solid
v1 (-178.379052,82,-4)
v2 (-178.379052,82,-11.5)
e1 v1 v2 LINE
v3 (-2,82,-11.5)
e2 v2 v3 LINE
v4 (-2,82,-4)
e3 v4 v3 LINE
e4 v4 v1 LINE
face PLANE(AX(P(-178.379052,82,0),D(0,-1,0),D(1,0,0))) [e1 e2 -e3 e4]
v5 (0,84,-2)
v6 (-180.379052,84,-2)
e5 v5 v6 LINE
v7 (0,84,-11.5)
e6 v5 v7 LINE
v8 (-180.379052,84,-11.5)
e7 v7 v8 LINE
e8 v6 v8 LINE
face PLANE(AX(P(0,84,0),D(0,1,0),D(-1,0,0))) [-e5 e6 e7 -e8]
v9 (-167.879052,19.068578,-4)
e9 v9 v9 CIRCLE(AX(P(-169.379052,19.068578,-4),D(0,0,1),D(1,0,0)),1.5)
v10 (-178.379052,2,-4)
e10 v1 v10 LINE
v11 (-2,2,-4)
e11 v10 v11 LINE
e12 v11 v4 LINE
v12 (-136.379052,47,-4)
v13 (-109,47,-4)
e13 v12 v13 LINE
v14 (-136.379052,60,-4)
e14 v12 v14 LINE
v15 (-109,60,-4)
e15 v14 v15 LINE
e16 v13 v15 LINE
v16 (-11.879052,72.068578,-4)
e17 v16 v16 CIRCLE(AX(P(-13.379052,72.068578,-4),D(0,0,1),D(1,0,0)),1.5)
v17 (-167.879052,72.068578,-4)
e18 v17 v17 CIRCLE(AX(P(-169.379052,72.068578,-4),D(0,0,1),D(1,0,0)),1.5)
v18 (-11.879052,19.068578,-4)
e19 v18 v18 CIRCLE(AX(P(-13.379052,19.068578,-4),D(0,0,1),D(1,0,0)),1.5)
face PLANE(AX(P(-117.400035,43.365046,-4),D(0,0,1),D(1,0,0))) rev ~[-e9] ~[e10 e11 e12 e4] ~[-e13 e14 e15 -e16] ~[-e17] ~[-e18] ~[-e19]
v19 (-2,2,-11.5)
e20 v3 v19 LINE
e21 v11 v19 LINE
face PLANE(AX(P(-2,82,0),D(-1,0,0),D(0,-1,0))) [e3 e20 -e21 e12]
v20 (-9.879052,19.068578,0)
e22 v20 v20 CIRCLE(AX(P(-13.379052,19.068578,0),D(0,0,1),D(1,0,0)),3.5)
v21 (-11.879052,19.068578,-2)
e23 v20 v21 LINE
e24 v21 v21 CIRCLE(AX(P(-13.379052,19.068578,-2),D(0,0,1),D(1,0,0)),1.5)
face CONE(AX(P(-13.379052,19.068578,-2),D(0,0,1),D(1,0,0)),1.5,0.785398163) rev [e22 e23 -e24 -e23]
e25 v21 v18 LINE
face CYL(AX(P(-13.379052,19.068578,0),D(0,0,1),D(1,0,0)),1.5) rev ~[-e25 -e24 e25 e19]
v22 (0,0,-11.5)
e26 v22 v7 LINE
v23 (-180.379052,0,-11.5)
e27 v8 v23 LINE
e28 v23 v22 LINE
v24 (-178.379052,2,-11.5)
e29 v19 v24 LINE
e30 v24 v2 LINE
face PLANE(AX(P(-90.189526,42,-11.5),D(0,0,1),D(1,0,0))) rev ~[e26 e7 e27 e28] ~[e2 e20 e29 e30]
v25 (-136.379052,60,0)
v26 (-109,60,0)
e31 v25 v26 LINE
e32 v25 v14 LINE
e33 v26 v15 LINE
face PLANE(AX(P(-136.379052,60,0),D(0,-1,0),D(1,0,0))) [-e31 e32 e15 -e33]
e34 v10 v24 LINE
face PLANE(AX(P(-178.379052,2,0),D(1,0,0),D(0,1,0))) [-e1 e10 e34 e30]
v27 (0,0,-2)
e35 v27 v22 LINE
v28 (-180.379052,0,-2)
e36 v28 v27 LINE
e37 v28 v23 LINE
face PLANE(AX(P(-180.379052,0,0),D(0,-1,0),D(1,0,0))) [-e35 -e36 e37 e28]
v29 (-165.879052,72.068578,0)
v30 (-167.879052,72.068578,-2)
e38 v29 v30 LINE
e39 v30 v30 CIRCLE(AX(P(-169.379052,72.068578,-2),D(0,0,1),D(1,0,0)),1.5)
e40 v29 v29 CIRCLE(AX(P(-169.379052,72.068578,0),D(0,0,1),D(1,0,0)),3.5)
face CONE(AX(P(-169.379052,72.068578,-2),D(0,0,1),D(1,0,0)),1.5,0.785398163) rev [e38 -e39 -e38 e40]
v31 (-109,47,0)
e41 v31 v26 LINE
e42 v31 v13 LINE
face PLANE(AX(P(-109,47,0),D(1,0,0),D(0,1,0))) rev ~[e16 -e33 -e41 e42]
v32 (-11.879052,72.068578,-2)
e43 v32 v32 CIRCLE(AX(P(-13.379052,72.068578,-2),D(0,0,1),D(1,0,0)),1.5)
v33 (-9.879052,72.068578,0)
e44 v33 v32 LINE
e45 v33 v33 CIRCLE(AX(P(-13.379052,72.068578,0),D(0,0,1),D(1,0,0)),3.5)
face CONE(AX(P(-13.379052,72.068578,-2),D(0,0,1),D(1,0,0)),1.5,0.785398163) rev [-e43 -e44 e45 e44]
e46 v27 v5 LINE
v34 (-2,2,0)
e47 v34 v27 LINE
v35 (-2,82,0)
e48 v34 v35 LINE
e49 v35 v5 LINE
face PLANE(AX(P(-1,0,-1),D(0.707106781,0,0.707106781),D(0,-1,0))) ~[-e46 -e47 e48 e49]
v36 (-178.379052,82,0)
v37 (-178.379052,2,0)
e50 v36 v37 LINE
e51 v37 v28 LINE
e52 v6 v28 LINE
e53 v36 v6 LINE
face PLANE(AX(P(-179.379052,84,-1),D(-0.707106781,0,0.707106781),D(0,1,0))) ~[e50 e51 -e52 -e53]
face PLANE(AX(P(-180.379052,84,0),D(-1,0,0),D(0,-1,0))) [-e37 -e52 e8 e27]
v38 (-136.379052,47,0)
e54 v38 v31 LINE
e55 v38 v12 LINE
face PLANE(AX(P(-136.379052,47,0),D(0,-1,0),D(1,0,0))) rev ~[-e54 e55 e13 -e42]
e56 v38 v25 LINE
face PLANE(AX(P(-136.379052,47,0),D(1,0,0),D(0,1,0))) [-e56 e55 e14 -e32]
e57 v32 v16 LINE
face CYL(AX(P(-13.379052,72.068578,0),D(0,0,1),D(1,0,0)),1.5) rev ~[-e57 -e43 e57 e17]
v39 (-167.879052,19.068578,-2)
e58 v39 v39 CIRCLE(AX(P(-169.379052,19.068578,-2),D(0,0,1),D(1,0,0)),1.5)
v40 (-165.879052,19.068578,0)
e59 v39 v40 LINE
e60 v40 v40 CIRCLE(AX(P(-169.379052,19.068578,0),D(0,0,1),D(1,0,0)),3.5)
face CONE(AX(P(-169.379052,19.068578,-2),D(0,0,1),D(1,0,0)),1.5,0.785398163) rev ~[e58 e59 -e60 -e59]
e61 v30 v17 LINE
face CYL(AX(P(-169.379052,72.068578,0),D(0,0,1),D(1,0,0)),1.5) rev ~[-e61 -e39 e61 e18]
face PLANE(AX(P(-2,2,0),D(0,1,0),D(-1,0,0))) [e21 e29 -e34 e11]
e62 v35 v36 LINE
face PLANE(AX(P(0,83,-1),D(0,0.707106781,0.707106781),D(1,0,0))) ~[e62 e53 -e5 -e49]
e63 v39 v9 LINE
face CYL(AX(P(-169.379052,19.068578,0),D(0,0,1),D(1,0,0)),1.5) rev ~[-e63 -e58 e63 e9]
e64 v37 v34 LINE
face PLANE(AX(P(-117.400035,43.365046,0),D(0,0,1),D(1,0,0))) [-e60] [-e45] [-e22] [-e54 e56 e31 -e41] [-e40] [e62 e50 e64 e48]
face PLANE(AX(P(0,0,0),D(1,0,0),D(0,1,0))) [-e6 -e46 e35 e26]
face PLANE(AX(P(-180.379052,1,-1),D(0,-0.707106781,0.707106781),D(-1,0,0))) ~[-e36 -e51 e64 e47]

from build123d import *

# Parameters (mm, degrees)
F1_DEPTH = 11.5
F0_R     = 1.5
F2_DEPTH = 4
F3_SIZE  = 2
F4_W     = 27.3790522566
F4_H     = 13
F5_DEPTH = 25


# Not quite as in the source:
# - a feature names something its author has since deleted; it is built from what else it names


with BuildPart() as f1:
    # F0 (on Top) → F1 (new body)
    with BuildSketch(Plane.XY):
        Polygon((-180.3790522566, 0), (0, 0), (0, 42), (0, 84), (-180.3790522566, 84), align=None)
        Polygon((-2, 82), (-2, 42), (-2, 2), (-35, 2), (-178.3790522566, 2), (-178.3790522566, 82), (-35, 82), align=None, mode=Mode.SUBTRACT)
    extrude(amount=-F1_DEPTH)

    # F0 (on Top) → F2 (join)
    with BuildSketch(Plane.XY):
        Polygon((-35, 76.0685783849), (-35, 82), (-178.3790522566, 82), (-178.3790522566, 2), (-35, 2), (-35, 15.0685783849), (-63, 15.0685783849), (-173.3790522566, 15.0685783849), (-173.3790522566, 76.0685783849), align=None)
        with BuildLine():
            Line((-35, 63), (-35, 76.0685783849))
            Line((-35, 76.0685783849), (-173.3790522566, 76.0685783849))
            Line((-173.3790522566, 76.0685783849), (-173.3790522566, 15.0685783849))
            Line((-173.3790522566, 15.0685783849), (-63, 15.0685783849))
            Line((-63, 15.0685783849), (-63, 21.5))
            Line((-63, 21.5), (-163, 21.5))
            Line((-163, 21.5), (-163, 62.5))
            Line((-163, 62.5), (-63, 62.5))
            Line((-63, 62.5), (-63, 42))
            Line((-63, 42), (-56, 42))
            ThreePointArc((-56, 42), (-51, 47), (-46, 42))
            Line((-46, 42), (-40, 42))
            ThreePointArc((-40, 42), (-38.5355339059, 45.5355339059), (-35, 47))
            Line((-35, 47), (-35, 53))
            ThreePointArc((-35, 53), (-40, 58), (-35, 63))
        make_face()
        with Locations((-169.3790522566, 19.0685783849)):
            Circle(F0_R, mode=Mode.SUBTRACT)
        with Locations((-169.3790522566, 72.0685783849)):
            Circle(F0_R, mode=Mode.SUBTRACT)
        with BuildLine():
            Line((-14, 42), (-9.3790522566, 42))
            Line((-9.3790522566, 42), (-9.3790522566, 76.0685783849))
            Line((-9.3790522566, 76.0685783849), (-35, 76.0685783849))
            Line((-35, 76.0685783849), (-35, 63))
            ThreePointArc((-35, 63), (-31.4644660941, 61.5355339059), (-30, 58))
            ThreePointArc((-30, 58), (-31.4644660941, 54.4644660941), (-35, 53))
            Line((-35, 53), (-35, 47))
            ThreePointArc((-35, 47), (-31.4644660941, 45.5355339059), (-30, 42))
            Line((-30, 42), (-24, 42))
            ThreePointArc((-24, 42), (-19, 47), (-14, 42))
        make_face()
        with Locations((-13.3790522566, 72.0685783849)):
            Circle(F0_R, mode=Mode.SUBTRACT)
        Polygon((-9.3790522566, 42), (-2, 42), (-2, 82), (-35, 82), (-35, 76.0685783849), (-9.3790522566, 76.0685783849), align=None)
        Polygon((-2, 2), (-2, 42), (-9.3790522566, 42), (-9.3790522566, 15.0685783849), (-35, 15.0685783849), (-35, 2), align=None)
        with BuildLine():
            Line((-9.3790522566, 15.0685783849), (-9.3790522566, 42))
            Line((-9.3790522566, 42), (-14, 42))
            ThreePointArc((-14, 42), (-19, 37), (-24, 42))
            Line((-24, 42), (-30, 42))
            ThreePointArc((-30, 42), (-31.4644660941, 38.4644660941), (-35, 37))
            Line((-35, 37), (-35, 31))
            ThreePointArc((-35, 31), (-31.4644660941, 29.5355339059), (-30, 26))
            ThreePointArc((-30, 26), (-31.4644660941, 22.4644660941), (-35, 21))
            Line((-35, 21), (-35, 15.0685783849))
            Line((-35, 15.0685783849), (-9.3790522566, 15.0685783849))
        make_face()
        with Locations((-13.3790522566, 19.0685783849)):
            Circle(F0_R, mode=Mode.SUBTRACT)
        with BuildLine():
            Line((-63, 15.0685783849), (-35, 15.0685783849))
            Line((-35, 15.0685783849), (-35, 21))
            ThreePointArc((-35, 21), (-40, 26), (-35, 31))
            Line((-35, 31), (-35, 37))
            ThreePointArc((-35, 37), (-38.5355339059, 38.4644660941), (-40, 42))
            Line((-40, 42), (-46, 42))
            ThreePointArc((-46, 42), (-51, 37), (-56, 42))
            Line((-56, 42), (-63, 42))
            Line((-63, 42), (-63, 21.5))
            Line((-63, 21.5), (-63, 15.0685783849))
        make_face()
        with BuildLine():
            Line((-46, 42), (-56, 42))
            ThreePointArc((-56, 42), (-51, 37), (-46, 42))
        make_face()
        with BuildLine():
            ThreePointArc((-46, 42), (-51, 47), (-56, 42))
            Line((-56, 42), (-46, 42))
        make_face()
        with BuildLine():
            ThreePointArc((-35, 37), (-31.4644660941, 38.4644660941), (-30, 42))
            Line((-30, 42), (-35, 42))
            Line((-35, 42), (-35, 37))
        make_face()
        with BuildLine():
            Line((-35, 42), (-30, 42))
            ThreePointArc((-30, 42), (-31.4644660941, 45.5355339059), (-35, 47))
            Line((-35, 47), (-35, 42))
        make_face()
        with BuildLine():
            ThreePointArc((-40, 42), (-38.5355339059, 38.4644660941), (-35, 37))
            Line((-35, 37), (-35, 42))
            Line((-35, 42), (-40, 42))
        make_face()
        with BuildLine():
            Line((-35, 42), (-35, 47))
            ThreePointArc((-35, 47), (-38.5355339059, 45.5355339059), (-40, 42))
            Line((-40, 42), (-35, 42))
        make_face()
        with BuildLine():
            ThreePointArc((-24, 42), (-19, 37), (-14, 42))
            Line((-14, 42), (-24, 42))
        make_face()
        with BuildLine():
            Line((-24, 42), (-14, 42))
            ThreePointArc((-14, 42), (-19, 47), (-24, 42))
        make_face()
        with BuildLine():
            ThreePointArc((-30, 58), (-31.4644660941, 61.5355339059), (-35, 63))
            Line((-35, 63), (-35, 58))
            Line((-35, 58), (-35, 53))
            ThreePointArc((-35, 53), (-31.4644660941, 54.4644660941), (-30, 58))
        make_face()
        with BuildLine():
            Line((-35, 58), (-35, 63))
            ThreePointArc((-35, 63), (-40, 58), (-35, 53))
            Line((-35, 53), (-35, 58))
        make_face()
        with BuildLine():
            Line((-35, 26), (-35, 21))
            ThreePointArc((-35, 21), (-31.4644660941, 22.4644660941), (-30, 26))
            ThreePointArc((-30, 26), (-31.4644660941, 29.5355339059), (-35, 31))
            Line((-35, 31), (-35, 26))
        make_face()
        with BuildLine():
            ThreePointArc((-35, 31), (-40, 26), (-35, 21))
            Line((-35, 21), (-35, 26))
            Line((-35, 26), (-35, 31))
        make_face()
        Polygon((-163, 21.5), (-63, 21.5), (-63, 42), (-63, 62.5), (-163, 62.5), align=None)
    extrude(amount=-F2_DEPTH)

    # F3
    f3_edges = [f1.edges().sort_by_distance(p)[0] for p in [
        (-90.189526, 84, 0),
        (0, 42, 0),
        (-90.189526, 0, 0),
        (-180.379052, 42, 0),
        (-170.879052, 19.068578, 0),
        (-14.879052, 72.068578, 0),
        (-14.879052, 19.068578, 0),
        (-170.879052, 72.068578, 0),
    ]]
    chamfer(f3_edges, length=F3_SIZE)

    # F4 (on face) → F5 (cut)
    with BuildSketch(Plane.XY):
        with Locations((-122.6895261283, 53.5)):
            Rectangle(F4_W, F4_H)
    extrude(amount=-F5_DEPTH, mode=Mode.SUBTRACT)


solid = f1.part
